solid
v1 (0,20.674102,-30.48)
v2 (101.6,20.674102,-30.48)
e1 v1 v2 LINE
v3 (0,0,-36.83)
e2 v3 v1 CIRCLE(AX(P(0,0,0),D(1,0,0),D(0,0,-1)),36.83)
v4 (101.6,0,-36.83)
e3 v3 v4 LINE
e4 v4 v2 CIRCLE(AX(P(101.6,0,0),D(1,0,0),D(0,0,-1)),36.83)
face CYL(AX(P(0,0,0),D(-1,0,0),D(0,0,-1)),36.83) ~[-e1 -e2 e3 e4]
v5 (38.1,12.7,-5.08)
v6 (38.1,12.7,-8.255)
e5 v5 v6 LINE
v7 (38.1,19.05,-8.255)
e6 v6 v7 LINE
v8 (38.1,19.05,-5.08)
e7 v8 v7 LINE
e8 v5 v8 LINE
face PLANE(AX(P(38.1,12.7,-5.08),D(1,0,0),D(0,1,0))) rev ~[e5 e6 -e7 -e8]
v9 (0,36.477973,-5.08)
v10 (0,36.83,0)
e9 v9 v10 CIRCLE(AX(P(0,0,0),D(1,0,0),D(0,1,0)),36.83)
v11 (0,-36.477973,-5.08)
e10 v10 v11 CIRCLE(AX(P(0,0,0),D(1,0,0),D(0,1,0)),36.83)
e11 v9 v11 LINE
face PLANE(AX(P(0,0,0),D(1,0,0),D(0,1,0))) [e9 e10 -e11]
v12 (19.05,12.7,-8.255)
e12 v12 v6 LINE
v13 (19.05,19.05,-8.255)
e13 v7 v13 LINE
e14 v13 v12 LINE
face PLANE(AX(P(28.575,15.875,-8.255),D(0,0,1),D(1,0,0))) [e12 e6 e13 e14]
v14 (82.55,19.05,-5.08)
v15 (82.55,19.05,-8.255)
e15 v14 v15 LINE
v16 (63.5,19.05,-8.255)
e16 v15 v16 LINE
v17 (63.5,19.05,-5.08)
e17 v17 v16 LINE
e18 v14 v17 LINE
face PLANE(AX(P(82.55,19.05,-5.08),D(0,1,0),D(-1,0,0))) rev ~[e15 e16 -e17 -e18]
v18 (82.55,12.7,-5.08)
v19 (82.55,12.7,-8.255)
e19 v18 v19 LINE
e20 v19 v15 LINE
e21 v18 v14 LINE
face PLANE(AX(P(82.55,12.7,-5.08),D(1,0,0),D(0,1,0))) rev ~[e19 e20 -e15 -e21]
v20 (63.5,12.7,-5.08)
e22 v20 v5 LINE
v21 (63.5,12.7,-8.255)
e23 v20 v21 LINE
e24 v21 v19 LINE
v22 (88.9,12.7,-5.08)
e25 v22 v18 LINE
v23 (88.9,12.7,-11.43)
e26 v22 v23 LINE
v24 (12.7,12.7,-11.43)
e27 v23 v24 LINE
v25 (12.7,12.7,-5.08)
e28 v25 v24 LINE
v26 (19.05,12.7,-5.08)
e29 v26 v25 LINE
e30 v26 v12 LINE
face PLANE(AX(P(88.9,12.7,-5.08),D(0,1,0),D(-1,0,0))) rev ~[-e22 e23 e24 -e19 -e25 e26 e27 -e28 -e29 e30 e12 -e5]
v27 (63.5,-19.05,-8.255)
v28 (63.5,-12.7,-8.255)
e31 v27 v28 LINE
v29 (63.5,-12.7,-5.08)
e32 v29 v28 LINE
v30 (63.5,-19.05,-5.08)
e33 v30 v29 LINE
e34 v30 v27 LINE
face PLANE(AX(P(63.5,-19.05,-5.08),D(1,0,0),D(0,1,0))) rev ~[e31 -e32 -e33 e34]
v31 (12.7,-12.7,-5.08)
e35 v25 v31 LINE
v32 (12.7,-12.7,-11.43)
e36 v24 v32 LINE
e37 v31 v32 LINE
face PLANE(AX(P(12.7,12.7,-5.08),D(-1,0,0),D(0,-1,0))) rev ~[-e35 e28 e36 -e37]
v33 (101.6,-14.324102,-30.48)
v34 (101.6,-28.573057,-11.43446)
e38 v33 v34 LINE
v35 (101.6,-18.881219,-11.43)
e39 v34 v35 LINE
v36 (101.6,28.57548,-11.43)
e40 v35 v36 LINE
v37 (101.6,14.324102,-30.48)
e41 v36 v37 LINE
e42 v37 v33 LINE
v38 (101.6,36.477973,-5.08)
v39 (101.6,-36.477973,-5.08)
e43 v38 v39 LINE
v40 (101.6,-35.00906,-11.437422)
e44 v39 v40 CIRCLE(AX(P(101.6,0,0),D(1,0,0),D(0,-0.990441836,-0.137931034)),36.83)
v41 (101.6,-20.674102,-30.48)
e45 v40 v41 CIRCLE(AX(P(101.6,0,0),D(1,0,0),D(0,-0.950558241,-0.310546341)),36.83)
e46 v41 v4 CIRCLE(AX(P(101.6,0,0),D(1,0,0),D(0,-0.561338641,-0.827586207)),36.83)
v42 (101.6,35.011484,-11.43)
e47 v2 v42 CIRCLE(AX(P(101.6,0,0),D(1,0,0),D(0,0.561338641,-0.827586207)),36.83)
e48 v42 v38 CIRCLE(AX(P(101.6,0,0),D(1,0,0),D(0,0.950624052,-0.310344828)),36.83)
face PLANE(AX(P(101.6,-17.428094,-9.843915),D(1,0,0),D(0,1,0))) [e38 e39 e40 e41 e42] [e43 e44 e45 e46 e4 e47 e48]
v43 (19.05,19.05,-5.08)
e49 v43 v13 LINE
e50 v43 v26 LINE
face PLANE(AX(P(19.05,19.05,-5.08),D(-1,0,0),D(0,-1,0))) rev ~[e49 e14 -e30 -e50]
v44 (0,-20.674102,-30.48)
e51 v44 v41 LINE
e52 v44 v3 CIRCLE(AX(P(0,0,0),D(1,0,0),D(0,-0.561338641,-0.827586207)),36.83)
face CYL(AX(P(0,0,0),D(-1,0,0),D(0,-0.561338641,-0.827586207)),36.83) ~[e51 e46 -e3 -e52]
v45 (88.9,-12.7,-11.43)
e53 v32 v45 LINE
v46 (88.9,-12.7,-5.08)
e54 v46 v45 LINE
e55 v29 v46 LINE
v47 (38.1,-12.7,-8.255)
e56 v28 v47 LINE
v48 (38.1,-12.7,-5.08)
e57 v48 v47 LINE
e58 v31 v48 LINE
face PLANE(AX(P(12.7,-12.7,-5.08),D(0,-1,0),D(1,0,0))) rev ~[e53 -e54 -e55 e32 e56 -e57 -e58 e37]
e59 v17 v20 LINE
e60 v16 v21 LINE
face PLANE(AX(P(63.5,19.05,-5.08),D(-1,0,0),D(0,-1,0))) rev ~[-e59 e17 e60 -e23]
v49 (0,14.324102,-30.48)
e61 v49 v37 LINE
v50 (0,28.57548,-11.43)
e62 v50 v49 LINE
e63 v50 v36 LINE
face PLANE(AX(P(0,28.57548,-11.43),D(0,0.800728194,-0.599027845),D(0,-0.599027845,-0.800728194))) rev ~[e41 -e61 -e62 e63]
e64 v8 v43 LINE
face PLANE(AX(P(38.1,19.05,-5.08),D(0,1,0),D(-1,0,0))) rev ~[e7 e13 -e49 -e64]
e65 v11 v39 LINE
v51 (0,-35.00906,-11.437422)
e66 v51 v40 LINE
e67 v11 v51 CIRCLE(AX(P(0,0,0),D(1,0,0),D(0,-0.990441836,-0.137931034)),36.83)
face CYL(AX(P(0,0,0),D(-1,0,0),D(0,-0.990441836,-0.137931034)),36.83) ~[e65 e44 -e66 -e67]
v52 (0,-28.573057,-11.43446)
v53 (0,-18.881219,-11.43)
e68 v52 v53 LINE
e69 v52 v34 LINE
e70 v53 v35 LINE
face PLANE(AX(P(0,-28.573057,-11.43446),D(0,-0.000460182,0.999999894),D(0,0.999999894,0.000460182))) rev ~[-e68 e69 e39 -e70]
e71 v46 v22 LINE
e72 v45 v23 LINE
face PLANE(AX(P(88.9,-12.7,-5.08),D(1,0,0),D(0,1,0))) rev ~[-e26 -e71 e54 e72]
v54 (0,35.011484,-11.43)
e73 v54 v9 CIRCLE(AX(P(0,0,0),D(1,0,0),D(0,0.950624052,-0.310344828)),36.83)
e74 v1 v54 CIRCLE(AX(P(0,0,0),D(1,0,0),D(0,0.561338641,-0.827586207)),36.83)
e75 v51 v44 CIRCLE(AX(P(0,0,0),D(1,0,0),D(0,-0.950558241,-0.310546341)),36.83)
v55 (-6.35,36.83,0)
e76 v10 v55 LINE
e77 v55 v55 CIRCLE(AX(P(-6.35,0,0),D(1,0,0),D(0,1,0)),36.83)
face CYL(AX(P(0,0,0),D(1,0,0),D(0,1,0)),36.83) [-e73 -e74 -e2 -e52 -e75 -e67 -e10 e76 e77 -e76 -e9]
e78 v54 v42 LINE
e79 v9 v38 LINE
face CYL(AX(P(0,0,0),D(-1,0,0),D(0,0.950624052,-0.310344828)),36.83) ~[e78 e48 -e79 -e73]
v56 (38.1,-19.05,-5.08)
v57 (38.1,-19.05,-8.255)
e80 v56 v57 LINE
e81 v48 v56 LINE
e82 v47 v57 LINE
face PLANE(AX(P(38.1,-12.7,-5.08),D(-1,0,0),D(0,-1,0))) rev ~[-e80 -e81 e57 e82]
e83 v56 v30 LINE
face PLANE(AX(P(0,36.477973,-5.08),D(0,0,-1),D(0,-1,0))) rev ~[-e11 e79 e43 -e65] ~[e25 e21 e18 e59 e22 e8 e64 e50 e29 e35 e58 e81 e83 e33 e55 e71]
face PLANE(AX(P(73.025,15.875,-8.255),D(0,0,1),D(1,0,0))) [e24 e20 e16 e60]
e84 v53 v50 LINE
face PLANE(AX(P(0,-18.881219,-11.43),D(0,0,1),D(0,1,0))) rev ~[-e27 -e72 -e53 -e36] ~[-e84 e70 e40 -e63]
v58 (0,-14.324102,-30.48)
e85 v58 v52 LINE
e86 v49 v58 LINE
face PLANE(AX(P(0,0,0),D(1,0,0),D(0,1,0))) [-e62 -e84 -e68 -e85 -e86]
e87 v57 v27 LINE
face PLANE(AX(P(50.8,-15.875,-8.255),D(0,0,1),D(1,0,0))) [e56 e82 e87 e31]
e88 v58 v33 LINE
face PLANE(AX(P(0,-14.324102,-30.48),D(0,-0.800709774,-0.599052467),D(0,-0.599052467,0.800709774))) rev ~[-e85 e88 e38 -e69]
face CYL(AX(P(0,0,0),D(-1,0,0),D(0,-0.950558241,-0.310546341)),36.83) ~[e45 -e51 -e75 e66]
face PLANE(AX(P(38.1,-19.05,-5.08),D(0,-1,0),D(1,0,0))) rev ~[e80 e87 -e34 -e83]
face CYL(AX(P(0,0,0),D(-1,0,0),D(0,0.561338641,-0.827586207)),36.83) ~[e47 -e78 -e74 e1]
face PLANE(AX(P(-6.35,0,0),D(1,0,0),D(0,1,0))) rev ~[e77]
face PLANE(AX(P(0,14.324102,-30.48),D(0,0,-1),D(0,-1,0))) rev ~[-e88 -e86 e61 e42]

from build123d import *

# Parameters (mm, degrees)
F2_DEPTH = 101.6
F0_R     = 36.83
F3_DEPTH = 6.35
F5_DEPTH = 6.35
F6_DEPTH = 3.175


# Not quite as in the source:
# - a feature names something its author has since deleted; it is built from what else it names


with BuildPart() as f2:
    # F1 (on face) → F2 (new body)
    with BuildSketch(Plane.YZ):
        Polygon((-28.5745194683, -8.2572300072), (-28.5730573626, -11.4344600145), (-18.8812190642, -11.43), (-6.2808282673, -11.43), (-6.2808282673, -8.2563601018), align=None)
        Polygon((0, -8.2561150224), (0, -11.43), (12.7450705782, -11.43), (28.5754804883, -11.43), (28.5754804883, -8.255), align=None)
        with BuildLine():
            Line((-14.324102157, -30.48), (-20.674102157, -30.48))
            ThreePointArc((-20.674102157, -30.48), (-10.8136603424, -35.2067273401), (0, -36.83))
            Line((0, -36.83), (0, -30.48))
            Line((0, -30.48), (-14.324102157, -30.48))
        make_face()
        with BuildLine():
            Line((0, -30.48), (0, -36.83))
            ThreePointArc((0, -36.83), (10.8136603424, -35.2067273401), (20.674102157, -30.48))
            Line((20.674102157, -30.48), (14.324102157, -30.48))
            Line((14.324102157, -30.48), (0, -30.48))
        make_face()
        Polygon((-6.2808282673, -11.43), (0, -11.43), (0, -8.2561150224), (-6.2808282673, -8.2563601018), align=None)
        Polygon((-6.2808282673, -8.2563601018), (0, -8.2561150224), (0, -5.08), (-6.2808282673, -5.08), align=None)
        with BuildLine():
            ThreePointArc((-36.4779728055, -5.08), (-35.8845812082, -8.2913045723), (-35.0090600232, -11.4374217503))
            Line((-35.0090600232, -11.4374217503), (-28.5730573626, -11.4344600145))
            Line((-28.5730573626, -11.4344600145), (-28.5745194683, -8.2572300072))
            Line((-28.5745194683, -8.2572300072), (-28.5759815739, -5.08))
            Line((-28.5759815739, -5.08), (-36.4779728055, -5.08))
        make_face()
        Polygon((-28.5759815739, -5.08), (-28.5745194683, -8.2572300072), (-6.2808282673, -8.2563601018), (-6.2808282673, -5.08), align=None)
        Polygon((0, -5.08), (0, -8.2561150224), (28.5754804883, -8.255), (28.5754804883, -5.08), align=None)
        with BuildLine():
            Line((28.5754804883, -11.43), (35.0114838303, -11.43))
            ThreePointArc((35.0114838303, -11.43), (35.8854598343, -8.2875009791), (36.4779728055, -5.08))
            Line((36.4779728055, -5.08), (28.5754804883, -5.08))
            Line((28.5754804883, -5.08), (28.5754804883, -8.255))
            Line((28.5754804883, -8.255), (28.5754804883, -11.43))
        make_face()
        with BuildLine():
            Line((14.324102157, -30.48), (20.674102157, -30.48))
            ThreePointArc((20.674102157, -30.48), (29.4269731146, -22.1472832038), (35.0114838303, -11.43))
            Line((35.0114838303, -11.43), (28.5754804883, -11.43))
            Line((28.5754804883, -11.43), (14.324102157, -30.48))
        make_face()
        with BuildLine():
            ThreePointArc((-35.0090600232, -11.4374217503), (-29.4246254725, -22.150402159), (-20.674102157, -30.48))
            Line((-20.674102157, -30.48), (-14.324102157, -30.48))
            Line((-14.324102157, -30.48), (-28.5730573626, -11.4344600145))
            Line((-28.5730573626, -11.4344600145), (-35.0090600232, -11.4374217503))
        make_face()
    extrude(amount=F2_DEPTH)

    # F0 (on Right) → F3 (join)
    with BuildSketch(Plane.YZ):
        Circle(F0_R)
    extrude(amount=-F3_DEPTH)

    # F4 (on face) → F5 (cut)
    with BuildSketch(Plane.XY.offset(-5.08)):
        Polygon((19.05, 12.7), (12.7, 12.7), (12.7, 0), (12.7, -12.7), (38.1, -12.7), (50.8, -12.7), (63.5, -12.7), (88.9, -12.7), (88.9, 0), (88.9, 12.7), (82.55, 12.7), (63.5, 12.7), (50.8, 12.7), (38.1, 12.7), align=None)
    extrude(amount=-F5_DEPTH, mode=Mode.SUBTRACT)

    # F4 (on face) → F6 (cut)
    with BuildSketch(Plane.XY.offset(-5.08)):
        Polygon((19.05, 15.875), (19.05, 12.7), (38.1, 12.7), (38.1, 15.875), (38.1, 19.05), (19.05, 19.05), align=None)
        Polygon((50.8, -12.7), (38.1, -12.7), (38.1, -15.875), (38.1, -19.05), (63.5, -19.05), (63.5, -15.875), (63.5, -12.7), align=None)
        Polygon((63.5, 15.875), (63.5, 12.7), (82.55, 12.7), (82.55, 15.875), (82.55, 19.05), (63.5, 19.05), align=None)
    extrude(amount=-F6_DEPTH, mode=Mode.SUBTRACT)


solid = f2.part
